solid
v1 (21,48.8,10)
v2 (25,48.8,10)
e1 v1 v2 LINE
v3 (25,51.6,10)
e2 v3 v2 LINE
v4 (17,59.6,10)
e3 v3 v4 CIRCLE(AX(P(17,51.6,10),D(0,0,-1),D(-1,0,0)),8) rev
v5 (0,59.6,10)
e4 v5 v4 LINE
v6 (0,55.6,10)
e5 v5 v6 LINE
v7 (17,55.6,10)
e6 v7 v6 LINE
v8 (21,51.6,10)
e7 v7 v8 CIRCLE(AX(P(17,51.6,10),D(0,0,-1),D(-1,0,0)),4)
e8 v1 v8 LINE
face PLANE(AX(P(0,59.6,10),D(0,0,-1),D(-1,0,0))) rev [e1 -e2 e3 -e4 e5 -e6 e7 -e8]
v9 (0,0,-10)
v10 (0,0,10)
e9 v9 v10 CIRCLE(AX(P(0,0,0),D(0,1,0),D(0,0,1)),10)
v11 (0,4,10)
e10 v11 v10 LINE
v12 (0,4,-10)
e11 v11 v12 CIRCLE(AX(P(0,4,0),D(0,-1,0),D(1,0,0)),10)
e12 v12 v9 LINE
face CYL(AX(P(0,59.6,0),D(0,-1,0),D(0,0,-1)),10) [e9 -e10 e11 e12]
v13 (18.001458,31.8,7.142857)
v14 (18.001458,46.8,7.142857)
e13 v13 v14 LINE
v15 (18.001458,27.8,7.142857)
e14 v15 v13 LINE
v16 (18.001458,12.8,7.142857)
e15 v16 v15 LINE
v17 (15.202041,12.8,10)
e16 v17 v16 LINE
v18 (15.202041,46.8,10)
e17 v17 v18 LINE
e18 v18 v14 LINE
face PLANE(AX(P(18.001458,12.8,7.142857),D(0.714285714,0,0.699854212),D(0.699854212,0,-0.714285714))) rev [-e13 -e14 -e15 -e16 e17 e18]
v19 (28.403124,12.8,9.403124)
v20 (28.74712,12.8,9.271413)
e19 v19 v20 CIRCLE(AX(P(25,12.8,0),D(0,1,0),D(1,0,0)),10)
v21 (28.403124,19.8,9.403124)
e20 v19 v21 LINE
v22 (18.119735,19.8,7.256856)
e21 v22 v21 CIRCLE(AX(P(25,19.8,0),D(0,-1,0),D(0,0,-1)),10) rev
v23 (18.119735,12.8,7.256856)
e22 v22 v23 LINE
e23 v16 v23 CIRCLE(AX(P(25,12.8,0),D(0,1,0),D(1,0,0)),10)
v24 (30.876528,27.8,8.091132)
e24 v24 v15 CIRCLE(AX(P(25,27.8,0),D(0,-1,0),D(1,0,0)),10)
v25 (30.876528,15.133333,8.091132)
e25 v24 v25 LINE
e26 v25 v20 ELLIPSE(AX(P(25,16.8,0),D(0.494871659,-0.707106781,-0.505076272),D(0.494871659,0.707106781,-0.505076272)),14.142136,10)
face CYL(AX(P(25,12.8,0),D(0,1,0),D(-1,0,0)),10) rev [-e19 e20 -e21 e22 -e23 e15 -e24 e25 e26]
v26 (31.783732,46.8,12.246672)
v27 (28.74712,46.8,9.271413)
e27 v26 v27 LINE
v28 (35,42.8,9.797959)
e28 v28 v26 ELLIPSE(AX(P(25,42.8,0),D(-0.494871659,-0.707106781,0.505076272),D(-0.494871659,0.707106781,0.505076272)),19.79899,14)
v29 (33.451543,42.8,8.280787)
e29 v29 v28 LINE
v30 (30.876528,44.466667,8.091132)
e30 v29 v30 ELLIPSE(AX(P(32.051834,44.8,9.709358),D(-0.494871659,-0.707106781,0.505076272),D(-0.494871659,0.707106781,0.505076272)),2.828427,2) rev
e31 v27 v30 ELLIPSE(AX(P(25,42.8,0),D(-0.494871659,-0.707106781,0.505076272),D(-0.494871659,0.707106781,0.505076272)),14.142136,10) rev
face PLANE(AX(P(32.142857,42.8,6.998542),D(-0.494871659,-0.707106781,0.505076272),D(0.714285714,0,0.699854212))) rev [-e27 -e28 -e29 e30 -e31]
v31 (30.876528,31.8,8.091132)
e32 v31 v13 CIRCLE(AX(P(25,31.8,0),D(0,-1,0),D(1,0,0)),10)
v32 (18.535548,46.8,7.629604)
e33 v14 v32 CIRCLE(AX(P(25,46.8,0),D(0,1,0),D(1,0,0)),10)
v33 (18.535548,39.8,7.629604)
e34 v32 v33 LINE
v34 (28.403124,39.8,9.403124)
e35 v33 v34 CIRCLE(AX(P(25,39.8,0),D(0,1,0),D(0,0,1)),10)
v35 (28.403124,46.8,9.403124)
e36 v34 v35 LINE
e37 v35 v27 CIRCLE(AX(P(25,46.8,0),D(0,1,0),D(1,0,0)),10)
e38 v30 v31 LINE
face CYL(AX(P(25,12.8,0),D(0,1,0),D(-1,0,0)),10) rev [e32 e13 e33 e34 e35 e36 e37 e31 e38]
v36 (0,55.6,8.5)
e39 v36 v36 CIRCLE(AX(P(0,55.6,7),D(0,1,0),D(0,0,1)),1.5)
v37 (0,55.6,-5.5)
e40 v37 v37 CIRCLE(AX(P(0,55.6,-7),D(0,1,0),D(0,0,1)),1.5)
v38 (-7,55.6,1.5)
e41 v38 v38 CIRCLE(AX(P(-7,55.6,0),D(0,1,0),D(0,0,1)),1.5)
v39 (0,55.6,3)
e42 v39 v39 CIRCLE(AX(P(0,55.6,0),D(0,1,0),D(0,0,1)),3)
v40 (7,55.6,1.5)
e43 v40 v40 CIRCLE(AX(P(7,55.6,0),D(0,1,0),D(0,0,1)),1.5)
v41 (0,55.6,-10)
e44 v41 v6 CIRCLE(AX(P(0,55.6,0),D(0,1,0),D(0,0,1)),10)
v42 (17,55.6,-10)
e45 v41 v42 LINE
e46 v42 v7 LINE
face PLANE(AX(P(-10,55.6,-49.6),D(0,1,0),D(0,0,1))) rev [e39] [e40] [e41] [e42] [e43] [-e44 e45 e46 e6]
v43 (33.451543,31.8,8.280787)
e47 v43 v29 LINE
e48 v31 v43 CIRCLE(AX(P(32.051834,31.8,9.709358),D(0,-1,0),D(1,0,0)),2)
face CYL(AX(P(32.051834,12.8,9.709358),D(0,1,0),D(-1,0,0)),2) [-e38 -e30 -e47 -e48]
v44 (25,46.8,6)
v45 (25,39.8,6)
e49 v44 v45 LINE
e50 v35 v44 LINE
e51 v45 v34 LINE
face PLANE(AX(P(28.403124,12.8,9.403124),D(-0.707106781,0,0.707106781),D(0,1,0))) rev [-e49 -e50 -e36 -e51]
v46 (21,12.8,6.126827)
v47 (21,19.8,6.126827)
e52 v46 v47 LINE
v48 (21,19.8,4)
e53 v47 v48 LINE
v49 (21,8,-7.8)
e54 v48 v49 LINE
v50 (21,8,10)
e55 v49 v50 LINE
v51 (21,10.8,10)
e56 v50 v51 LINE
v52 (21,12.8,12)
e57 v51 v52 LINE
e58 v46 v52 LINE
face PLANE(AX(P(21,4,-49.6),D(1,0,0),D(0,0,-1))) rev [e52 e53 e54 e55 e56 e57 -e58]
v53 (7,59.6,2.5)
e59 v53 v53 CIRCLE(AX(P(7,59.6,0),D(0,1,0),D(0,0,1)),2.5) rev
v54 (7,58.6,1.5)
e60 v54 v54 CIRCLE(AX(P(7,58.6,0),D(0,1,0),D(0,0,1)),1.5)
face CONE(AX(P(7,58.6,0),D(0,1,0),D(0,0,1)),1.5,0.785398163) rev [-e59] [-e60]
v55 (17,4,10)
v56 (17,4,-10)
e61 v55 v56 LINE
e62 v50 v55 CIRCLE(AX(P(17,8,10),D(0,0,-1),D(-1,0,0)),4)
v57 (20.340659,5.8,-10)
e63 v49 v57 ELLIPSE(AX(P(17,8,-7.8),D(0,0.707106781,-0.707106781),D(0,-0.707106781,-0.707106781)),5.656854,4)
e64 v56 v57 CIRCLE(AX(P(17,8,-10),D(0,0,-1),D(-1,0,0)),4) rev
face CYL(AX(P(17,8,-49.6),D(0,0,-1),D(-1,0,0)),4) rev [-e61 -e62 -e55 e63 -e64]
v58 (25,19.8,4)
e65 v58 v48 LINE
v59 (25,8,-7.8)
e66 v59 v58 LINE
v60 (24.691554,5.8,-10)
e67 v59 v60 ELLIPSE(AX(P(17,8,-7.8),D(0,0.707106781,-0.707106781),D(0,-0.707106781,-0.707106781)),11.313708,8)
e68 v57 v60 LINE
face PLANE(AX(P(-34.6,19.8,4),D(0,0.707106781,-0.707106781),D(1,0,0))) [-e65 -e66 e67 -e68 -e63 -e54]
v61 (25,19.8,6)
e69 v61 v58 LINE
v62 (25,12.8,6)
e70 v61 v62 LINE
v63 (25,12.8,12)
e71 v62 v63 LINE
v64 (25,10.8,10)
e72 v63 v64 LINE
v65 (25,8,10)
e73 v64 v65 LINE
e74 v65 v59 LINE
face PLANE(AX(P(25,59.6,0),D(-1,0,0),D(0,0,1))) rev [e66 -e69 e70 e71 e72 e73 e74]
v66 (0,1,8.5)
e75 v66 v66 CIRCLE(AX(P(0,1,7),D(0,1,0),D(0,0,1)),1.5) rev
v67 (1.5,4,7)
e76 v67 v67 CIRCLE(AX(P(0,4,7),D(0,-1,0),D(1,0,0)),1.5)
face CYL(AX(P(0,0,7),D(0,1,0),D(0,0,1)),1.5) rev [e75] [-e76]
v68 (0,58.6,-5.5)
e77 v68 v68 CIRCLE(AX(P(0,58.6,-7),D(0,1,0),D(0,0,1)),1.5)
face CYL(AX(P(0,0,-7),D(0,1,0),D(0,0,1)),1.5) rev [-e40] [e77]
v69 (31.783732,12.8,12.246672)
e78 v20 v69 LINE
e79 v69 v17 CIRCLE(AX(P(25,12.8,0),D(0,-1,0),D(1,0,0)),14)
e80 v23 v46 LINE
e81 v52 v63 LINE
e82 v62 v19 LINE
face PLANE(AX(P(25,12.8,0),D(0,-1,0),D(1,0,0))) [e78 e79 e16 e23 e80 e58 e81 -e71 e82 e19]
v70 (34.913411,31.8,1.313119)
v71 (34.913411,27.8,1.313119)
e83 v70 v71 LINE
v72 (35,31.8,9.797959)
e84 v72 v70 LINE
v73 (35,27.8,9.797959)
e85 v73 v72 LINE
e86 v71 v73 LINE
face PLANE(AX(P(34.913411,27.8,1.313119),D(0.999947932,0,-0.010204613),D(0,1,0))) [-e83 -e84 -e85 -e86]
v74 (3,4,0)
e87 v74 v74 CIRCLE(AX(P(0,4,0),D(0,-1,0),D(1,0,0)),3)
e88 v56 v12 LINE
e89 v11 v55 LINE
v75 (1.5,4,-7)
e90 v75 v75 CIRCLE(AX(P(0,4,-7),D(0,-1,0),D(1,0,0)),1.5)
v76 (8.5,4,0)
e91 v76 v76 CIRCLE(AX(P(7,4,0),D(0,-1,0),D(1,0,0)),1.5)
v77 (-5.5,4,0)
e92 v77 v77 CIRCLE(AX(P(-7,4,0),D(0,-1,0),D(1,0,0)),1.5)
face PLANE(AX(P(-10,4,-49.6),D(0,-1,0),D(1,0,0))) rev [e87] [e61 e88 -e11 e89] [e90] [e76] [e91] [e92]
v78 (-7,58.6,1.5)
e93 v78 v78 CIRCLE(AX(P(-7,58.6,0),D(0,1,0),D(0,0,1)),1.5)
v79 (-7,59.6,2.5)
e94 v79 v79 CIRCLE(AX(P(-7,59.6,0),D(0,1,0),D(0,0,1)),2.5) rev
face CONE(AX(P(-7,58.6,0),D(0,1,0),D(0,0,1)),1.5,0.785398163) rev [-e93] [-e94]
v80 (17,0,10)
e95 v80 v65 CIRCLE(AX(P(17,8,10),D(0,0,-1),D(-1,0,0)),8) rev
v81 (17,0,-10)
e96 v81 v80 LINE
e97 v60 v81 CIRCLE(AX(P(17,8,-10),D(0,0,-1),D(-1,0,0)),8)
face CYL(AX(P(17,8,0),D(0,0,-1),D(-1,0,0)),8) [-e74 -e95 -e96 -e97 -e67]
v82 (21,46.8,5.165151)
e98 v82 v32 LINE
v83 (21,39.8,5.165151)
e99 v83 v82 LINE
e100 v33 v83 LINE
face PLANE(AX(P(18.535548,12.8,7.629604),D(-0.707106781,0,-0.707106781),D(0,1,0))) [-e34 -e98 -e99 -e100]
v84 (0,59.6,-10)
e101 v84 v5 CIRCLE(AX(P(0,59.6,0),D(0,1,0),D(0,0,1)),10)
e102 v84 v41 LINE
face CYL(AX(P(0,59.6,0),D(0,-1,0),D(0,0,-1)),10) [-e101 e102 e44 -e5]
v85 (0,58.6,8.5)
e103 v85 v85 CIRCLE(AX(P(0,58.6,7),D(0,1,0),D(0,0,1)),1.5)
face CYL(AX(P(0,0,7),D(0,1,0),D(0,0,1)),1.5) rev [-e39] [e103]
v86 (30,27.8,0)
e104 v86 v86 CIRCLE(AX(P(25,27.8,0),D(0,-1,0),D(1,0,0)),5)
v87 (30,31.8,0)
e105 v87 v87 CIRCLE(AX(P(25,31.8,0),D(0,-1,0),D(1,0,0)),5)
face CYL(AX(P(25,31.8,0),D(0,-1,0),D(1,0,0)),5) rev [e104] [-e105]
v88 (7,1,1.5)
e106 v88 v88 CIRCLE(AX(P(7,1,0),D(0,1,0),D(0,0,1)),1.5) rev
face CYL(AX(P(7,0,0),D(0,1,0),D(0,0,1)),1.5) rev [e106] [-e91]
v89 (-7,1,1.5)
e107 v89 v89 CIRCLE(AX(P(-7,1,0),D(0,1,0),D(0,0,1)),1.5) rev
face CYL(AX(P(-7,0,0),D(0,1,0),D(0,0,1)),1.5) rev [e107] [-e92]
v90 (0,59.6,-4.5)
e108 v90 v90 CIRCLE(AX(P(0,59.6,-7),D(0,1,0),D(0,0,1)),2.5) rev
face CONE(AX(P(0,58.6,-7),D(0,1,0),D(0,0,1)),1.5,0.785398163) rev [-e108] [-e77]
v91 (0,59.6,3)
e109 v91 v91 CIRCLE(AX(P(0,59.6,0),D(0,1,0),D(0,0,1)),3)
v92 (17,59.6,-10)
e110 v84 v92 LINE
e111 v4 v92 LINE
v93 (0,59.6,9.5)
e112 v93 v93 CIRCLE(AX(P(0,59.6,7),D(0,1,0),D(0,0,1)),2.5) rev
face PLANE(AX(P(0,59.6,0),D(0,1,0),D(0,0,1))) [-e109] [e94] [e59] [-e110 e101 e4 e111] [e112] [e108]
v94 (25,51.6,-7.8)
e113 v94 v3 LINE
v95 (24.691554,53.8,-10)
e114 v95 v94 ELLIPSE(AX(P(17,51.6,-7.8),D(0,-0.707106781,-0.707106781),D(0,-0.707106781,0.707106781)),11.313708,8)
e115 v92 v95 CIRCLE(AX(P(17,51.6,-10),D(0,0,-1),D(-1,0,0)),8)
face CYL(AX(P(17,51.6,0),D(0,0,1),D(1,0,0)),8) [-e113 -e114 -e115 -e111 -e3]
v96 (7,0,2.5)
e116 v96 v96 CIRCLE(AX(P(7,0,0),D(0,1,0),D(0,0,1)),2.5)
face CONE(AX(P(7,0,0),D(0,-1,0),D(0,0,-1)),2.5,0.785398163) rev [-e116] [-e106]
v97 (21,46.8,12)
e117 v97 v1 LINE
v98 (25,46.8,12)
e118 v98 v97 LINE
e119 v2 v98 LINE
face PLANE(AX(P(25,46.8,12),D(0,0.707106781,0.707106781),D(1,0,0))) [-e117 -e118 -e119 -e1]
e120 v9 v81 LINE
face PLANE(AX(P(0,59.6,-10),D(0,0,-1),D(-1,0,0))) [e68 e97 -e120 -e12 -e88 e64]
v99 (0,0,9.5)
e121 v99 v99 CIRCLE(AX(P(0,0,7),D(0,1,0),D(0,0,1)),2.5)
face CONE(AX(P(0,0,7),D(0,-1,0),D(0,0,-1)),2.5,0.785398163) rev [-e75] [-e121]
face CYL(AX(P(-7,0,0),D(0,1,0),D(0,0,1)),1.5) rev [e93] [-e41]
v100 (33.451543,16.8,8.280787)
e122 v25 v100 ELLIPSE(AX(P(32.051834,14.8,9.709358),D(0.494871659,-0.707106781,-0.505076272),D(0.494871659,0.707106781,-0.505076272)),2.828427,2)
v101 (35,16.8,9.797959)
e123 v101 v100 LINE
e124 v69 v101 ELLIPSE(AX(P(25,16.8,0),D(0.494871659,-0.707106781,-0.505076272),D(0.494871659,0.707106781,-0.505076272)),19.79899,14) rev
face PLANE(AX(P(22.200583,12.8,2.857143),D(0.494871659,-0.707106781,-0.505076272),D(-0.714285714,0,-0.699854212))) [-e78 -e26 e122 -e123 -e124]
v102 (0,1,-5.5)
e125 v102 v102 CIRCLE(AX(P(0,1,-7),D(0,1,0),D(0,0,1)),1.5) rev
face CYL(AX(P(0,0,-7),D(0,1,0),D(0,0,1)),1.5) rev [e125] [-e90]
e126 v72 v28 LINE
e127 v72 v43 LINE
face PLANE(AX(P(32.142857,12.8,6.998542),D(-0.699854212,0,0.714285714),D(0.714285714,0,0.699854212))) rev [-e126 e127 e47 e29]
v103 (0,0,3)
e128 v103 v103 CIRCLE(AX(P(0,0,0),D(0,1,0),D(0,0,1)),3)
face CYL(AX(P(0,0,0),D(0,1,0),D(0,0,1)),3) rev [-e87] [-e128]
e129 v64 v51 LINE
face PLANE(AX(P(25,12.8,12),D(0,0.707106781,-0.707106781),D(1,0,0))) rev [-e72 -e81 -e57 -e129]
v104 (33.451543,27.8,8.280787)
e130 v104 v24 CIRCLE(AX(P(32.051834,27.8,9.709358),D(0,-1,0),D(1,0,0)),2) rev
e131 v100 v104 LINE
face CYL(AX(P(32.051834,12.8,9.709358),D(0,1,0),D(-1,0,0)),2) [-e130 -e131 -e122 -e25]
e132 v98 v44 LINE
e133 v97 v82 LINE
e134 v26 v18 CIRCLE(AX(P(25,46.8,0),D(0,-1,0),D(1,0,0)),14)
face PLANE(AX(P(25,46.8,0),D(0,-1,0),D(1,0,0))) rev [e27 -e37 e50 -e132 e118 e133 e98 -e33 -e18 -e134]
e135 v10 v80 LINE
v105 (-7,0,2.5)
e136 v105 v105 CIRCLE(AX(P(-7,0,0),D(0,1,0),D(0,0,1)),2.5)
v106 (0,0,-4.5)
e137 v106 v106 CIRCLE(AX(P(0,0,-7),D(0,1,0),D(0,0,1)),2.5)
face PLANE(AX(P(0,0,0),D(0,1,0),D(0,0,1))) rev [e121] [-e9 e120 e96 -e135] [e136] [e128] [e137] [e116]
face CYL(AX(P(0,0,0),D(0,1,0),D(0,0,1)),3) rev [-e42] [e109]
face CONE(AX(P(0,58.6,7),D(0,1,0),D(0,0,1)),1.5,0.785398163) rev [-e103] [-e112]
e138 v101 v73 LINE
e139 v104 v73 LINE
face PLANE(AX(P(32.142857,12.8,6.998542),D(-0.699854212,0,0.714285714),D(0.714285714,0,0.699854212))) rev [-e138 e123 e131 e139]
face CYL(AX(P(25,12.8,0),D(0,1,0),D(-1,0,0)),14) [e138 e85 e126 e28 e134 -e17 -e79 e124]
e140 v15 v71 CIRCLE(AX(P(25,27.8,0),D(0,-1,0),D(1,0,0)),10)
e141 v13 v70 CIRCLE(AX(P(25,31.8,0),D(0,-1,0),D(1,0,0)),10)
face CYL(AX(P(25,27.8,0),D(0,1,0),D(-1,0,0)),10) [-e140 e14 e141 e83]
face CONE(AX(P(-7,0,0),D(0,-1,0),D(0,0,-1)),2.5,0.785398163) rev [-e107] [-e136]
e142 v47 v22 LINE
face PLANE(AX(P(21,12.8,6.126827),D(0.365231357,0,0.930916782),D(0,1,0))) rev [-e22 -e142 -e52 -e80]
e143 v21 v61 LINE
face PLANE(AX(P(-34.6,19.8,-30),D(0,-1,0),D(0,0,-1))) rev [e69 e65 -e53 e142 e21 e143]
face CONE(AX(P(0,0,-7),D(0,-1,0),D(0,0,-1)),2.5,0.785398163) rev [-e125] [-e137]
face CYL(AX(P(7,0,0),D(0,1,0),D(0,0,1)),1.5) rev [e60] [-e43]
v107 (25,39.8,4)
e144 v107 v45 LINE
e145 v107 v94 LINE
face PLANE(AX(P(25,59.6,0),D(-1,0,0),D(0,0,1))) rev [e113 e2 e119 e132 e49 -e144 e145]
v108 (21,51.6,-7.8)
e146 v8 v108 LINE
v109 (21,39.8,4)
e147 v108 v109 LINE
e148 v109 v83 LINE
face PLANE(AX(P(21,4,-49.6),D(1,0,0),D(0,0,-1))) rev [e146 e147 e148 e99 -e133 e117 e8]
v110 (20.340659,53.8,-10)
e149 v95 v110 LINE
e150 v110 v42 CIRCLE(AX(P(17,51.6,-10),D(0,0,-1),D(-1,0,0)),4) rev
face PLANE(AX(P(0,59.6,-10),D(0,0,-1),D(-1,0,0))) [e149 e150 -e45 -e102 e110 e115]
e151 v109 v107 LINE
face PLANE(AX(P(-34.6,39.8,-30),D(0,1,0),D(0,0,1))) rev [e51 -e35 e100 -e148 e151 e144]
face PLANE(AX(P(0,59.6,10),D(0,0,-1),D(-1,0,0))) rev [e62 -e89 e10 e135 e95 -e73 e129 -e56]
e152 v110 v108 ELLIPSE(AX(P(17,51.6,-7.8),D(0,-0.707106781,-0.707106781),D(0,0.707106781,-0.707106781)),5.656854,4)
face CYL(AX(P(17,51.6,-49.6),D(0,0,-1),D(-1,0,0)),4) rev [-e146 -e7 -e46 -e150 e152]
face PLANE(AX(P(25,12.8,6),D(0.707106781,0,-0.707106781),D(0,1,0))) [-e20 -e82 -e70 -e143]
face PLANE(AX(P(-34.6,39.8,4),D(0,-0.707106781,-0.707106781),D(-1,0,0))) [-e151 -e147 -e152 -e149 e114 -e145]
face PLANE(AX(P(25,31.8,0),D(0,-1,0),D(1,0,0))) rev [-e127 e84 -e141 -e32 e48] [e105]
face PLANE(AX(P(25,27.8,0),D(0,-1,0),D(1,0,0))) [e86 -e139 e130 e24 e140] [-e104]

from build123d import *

# Parameters (mm, degrees)
BOSS_EXTRUDE1_DEPTH = 59.6
CUT_EXTRUDE1_DEPTH  = 59.6
SKETCH3_R           = 1.5000000000000004
SKETCH3_R_2         = 1.5000000000000007
SKETCH3_R_3         = 1.5000000000000009
SKETCH3_R_4         = 1.5000000000000002
CUT_EXTRUDE2_DEPTH  = 66.4
CHAMFER1_SIZE       = 1
SKETCH4_R           = 3
CUT_EXTRUDE3_DEPTH  = 66.4
FILLET1_R           = 4
CUT_EXTRUDE4_DEPTH  = 59.6
SKETCH5_R           = 10
BOSS_EXTRUDE2_DEPTH = 2
BOSS_EXTRUDE3_DEPTH = 17
CHAMFER2_SIZE       = 4
CHAMFER2_SIZE_2     = 3.038324347
CHAMFER3_SIZE       = 4
FILLET3_R           = 2
CHAMFER4_SIZE       = 14
CHAMFER5_SIZE       = 2
FILLET4_R           = 8
SKETCH11_R          = 5.000000000000001
CUT_EXTRUDE5_DEPTH  = 4


with BuildPart() as part:
    # Sketch1 → Boss-Extrude1 (new body)
    with BuildSketch(Plane(origin=(0, 0, 0), x_dir=(1, 0, 0), z_dir=(0, 1, 0))):
        with BuildLine():
            ThreePointArc((6.1e-16, 9.999999999999998), (-9.999999999999998, 1.22e-15), (-1.84e-15, -9.999999999999998))
            Line((0, -9.999999999999998), (0, 10.000000000000002))
        make_face()
        with BuildLine():
            Line((0, 10.000000000000002), (0, -9.999999999999998))
            ThreePointArc((-1.84e-15, -9.999999999999998), (7.071067811865472, -7.0710678118654755), (9.999999999999998, -2.45e-15))
            ThreePointArc((9.999999999999998, 0), (7.071067811865475, 7.071067811865474), (6.1e-16, 9.999999999999998))
        make_face()
        with BuildLine():
            ThreePointArc((9.999999999999998, -2.45e-15), (7.071067811865472, -7.0710678118654755), (-1.84e-15, -9.999999999999998))
            Line((0, -9.999999999999998), (25, -9.999999999999998))
            Line((25, -9.999999999999998), (25, 10.000000000000002))
            Line((25, 10), (0, 10.000000000000002))
            ThreePointArc((6.1e-16, 9.999999999999998), (7.071067811865475, 7.071067811865474), (9.999999999999998, 0))
        make_face()
    extrude(amount=BOSS_EXTRUDE1_DEPTH)

    # Sketch2 → Cut-Extrude1 (cut)
    with BuildSketch(Plane.XY.offset(9.999999999999998)):
        Polygon((-9.999999999999998, 4.0000000000000036), (21, 4), (21, 55.599999999999994), (-9.999999999999998, 55.599999999999994), align=None)
    extrude(amount=-CUT_EXTRUDE1_DEPTH, mode=Mode.SUBTRACT)

    # Sketch3 → Cut-Extrude2 (cut, through all)
    with BuildSketch(Plane(origin=(0, 59.6, 0), x_dir=(1, 0, 0), z_dir=(0, 1, 0))):
        with Locations(Location((-7, 0, 0), (0, 0, 270))):
            Circle(SKETCH3_R)
        with Locations(Location((2.444e-14, 7, 0), (0, 0, 270))):
            Circle(SKETCH3_R_2)
        with Locations(Location((7, -4.888e-14, 0), (0, 0, 270))):
            Circle(SKETCH3_R_3)
        with Locations(Location((-7.332e-14, -7.000000000000001, 0), (0, 0, 270))):
            Circle(SKETCH3_R_4)
    extrude(amount=-CUT_EXTRUDE2_DEPTH, mode=Mode.SUBTRACT)

    # Chamfer1
    chamfer1_edges = [part.edges().sort_by_distance(p)[0] for p in [
        (-7, 0, -1.5000000000000004),
        (-7, 59.6, -1.5000000000000004),
        (2.49e-14, 0, -8.5),
        (2.49e-14, 59.6, -8.5),
        (7.000000000000001, 0, -1.499999999999952),
        (7.000000000000001, 59.6, -1.499999999999952),
        (-7.286e-14, 0, 5.500000000000001),
        (-7.286e-14, 59.6, 5.500000000000001),
    ]]
    chamfer(chamfer1_edges, length=CHAMFER1_SIZE)

    # Sketch4 → Cut-Extrude3 (cut, through all)
    with BuildSketch(Plane(origin=(0, 59.6, 0), x_dir=(1, 0, 0), z_dir=(0, 1, 0))):
        with Locations(Location((0, 0, 0), (0, 0, 270))):
            Circle(SKETCH4_R)
    extrude(amount=-CUT_EXTRUDE3_DEPTH, mode=Mode.SUBTRACT)

    # Fillet1
    fillet1_edges = [part.edges().sort_by_distance(p)[0] for p in [
        (21, 4, -1.78e-15),
        (21, 55.599999999999994, -1.78e-15),
    ]]
    fillet(fillet1_edges, radius=FILLET1_R)

    # Sketch6 → Cut-Extrude4 (cut)
    with BuildSketch(Plane(origin=(25, 0, 0), x_dir=(0, 0, -1), z_dir=(1, 0, 0))):
        Polygon((30, 19.799999999999997), (-10, 19.799999999999983), (-9.999999999999998, 39.800000000000004), (30, 39.800000000000004), align=None)
    extrude(amount=-CUT_EXTRUDE4_DEPTH, mode=Mode.SUBTRACT)


with BuildPart() as cut_extrude4_piece_1:
    # of the separate pieces the step leaves, piece 1, a body of its own (cut_extrude4_pieces)
    add(part.part.solids().sort_by_distance((21, 39.8, -10))[0])



with BuildPart() as cut_extrude4_piece_2:
    # of the separate pieces the step leaves, piece 2, a body of its own (cut_extrude4_pieces)
    add(part.part.solids().sort_by_distance((17, 4, -10))[0])


with BuildPart() as body_3:
    # Sketch5 → Boss-Extrude2 (new, symmetric)
    with BuildSketch(Plane(origin=(1.67e-15, 29.8, 0), x_dir=(-1, 6e-17, 0), z_dir=(-6e-17, -1, 0))):
        with Locations(Location((-25, 0, 0), (0, 0, 180))):
            Circle(SKETCH5_R)
    extrude(amount=BOSS_EXTRUDE2_DEPTH, both=True)


with BuildPart() as cut_extrude4_piece_1_1:
    add(cut_extrude4_piece_1.part)

    add(cut_extrude4_piece_2.part)  # Boss-Extrude3 merges Cut-Extrude4 piece 2

    add(body_3.part)  # Boss-Extrude3 merges body 3
    # Sketch8 → Boss-Extrude3 (add, symmetric)
    with BuildSketch(Plane(origin=(1.67e-15, 29.8, 0), x_dir=(-1, 6e-17, 0), z_dir=(-6e-17, -1, 0))):
        with BuildLine():
            Line((-18.00145787776235, -7.1428571428571415), (-15.202041028867285, -9.999999999999998))
            ThreePointArc((-15.202041028867285, -9.999999999999998), (-25.14286458158996, -13.999271042140986), (-35, -9.797958971132715))
            Line((-35, -9.797958971132715), (-32.142857142857146, -6.998542122237653))
            ThreePointArc((-32.142857142857146, -6.998542122237653), (-25.10204612970712, -9.999479315814993), (-18.00145787776235, -7.1428571428571415))
        make_face()
    extrude(amount=BOSS_EXTRUDE3_DEPTH, both=True)

    # Chamfer2
    # the kernel refuses this chamfer: 4, 3.038324347 mm, written as the material it adds along each edge
    with BuildSketch(Plane(origin=(25, 39.800000000000004, 9.999999999999998), x_dir=(0, 0, -1), z_dir=(0, 1, 0))) as chamfer2_piece_1:
        with BuildLine():
            Line((CHAMFER2_SIZE, 0), (0.5968757625671461, -3.403124237432852))
            ThreePointArc((0.5968757625671461, -3.403124237432852), (0.15846004750250664, -1.7731585838259747), (0, 0))
            Line((0, 0), (CHAMFER2_SIZE, 0))
        make_face()
    extrude(amount=6.999999999999993)
    with BuildSketch(Plane(origin=(25, 12.799999999999999, 9.999999999999998), x_dir=(0.9849650815494138, 0, -0.17275354736837392), z_dir=(0, 1, 0))) as chamfer2_piece_2:
        with BuildLine():
            Line((3.4550709473675134, 2e-17), (CHAMFER2_SIZE * 0.172753547368, CHAMFER2_SIZE * 0.984965081549))
            Line((CHAMFER2_SIZE * 0.172753547368, CHAMFER2_SIZE * 0.984965081549), (0, 0))
            ThreePointArc((0, 0), (1.773873824440413, -0.15024182179198892), (3.4550709473675134, 2e-17))
        make_face()
    extrude(amount=6.999999999999984)
    with BuildSketch(Plane(origin=(21, 46.8, 9.165151389911681), x_dir=(0, 0, -1), z_dir=(-6e-17, -1, 0))) as chamfer2_piece_3:
        with BuildLine():
            Line((CHAMFER2_SIZE, 0), (1.5355475582413494, -2.464452441758805))
            ThreePointArc((1.5355475582413494, -2.464452441758805), (0.6874579868810571, -1.3036510598088036), (0, 0))
            Line((0, 0), (CHAMFER2_SIZE, 0))
        make_face()
    extrude(amount=6.999999999999993)
    with BuildSketch(Plane(origin=(21, 19.799999999999983, 9.165151389911681), x_dir=(-0.8336339896703572, 0, -0.5523172740973098), z_dir=(-6e-17, -1, 0))) as chamfer2_piece_4:
        with BuildLine():
            Line((3.4550709473675125, 1.3e-16), (CHAMFER2_SIZE_2 * 0.552317274099, CHAMFER2_SIZE_2 * 0.833633989672))
            Line((CHAMFER2_SIZE_2 * 0.552317274099, CHAMFER2_SIZE_2 * 0.833633989672), (0, 0))
            ThreePointArc((0, 0), (1.7738738244404142, -0.1502418217919865), (3.4550709473675125, 1.3e-16))
        make_face()
    extrude(amount=6.999999999999982)
    # the kernel refuses this chamfer: 4, 3.038324347 mm, written as the material it takes off along each edge
    with BuildSketch(Plane(origin=(42.3476656799026, 46.8, 16.997171657661287), x_dir=(4.2e-16, -1, -4.8e-16), z_dir=(-0.7142857142857139, 0, -0.6998542122237658))) as chamfer2_2_piece_1_section:
        Polygon((CHAMFER2_SIZE, 0), (-2.54e-15, CHAMFER2_SIZE), (0, 0), align=None)
    chamfer2_2_piece_1 = extrude(amount=24.573463903727287, mode=Mode.PRIVATE)
    chamfer2_2_piece_1 = split(chamfer2_2_piece_1, bisect_by=Plane(origin=(25, 46.8, 16.997171657661287), z_dir=(1, 0, 0)), keep=Keep.TOP, mode=Mode.PRIVATE)
    add(chamfer2_2_piece_1, mode=Mode.SUBTRACT)
    with BuildSketch(Plane(origin=(42.3476656799026, 12.799999999999999, 16.997171657661287), x_dir=(-0.6998542122237658, 0, 0.7142857142857139), z_dir=(-0.7142857142857139, 0, -0.6998542122237658))) as chamfer2_2_piece_2_section:
        Polygon((CHAMFER2_SIZE, 0), (-2.54e-15, CHAMFER2_SIZE), (0, 0), align=None)
    chamfer2_2_piece_2 = extrude(amount=24.57346390372729, mode=Mode.PRIVATE)
    chamfer2_2_piece_2 = split(chamfer2_2_piece_2, bisect_by=Plane(origin=(25, 12.799999999999999, 16.997171657661287), z_dir=(1, 0, 0)), keep=Keep.TOP, mode=Mode.PRIVATE)
    add(chamfer2_2_piece_2, mode=Mode.SUBTRACT)

    # Chamfer3
    # the kernel refuses this chamfer: 4 mm, written as the material it adds along each edge
    with BuildSketch(Plane(origin=(32.142857142857146, 31.8, 6.998542122237653), x_dir=(0.7142857142857139, 0, 0.6998542122237658), z_dir=(0, -1, 0))) as chamfer3_piece_1:
        with BuildLine():
            Line((CHAMFER3_SIZE, -9e-17), (-2.0000000000000133, -6.0000000000000115))
            ThreePointArc((-2.0000000000000133, -6.0000000000000115), (-0.5373798977418118, -3.234010018589798), (0, 0))
            Line((0, 0), (CHAMFER3_SIZE, -9e-17))
        make_face()
    extrude(amount=4)

    # Fillet3
    fillet3_edges = [cut_extrude4_piece_1_1.edges().sort_by_distance(p)[0] for p in [
        (32.142857142857146, 37.3, 6.998542122237653),
        (32.142857142857146, 22.3, 6.998542122237653),
    ]]
    fillet(fillet3_edges, radius=FILLET3_R)

    # Chamfer4
    chamfer4_edges = [cut_extrude4_piece_1_1.edges().sort_by_distance(p)[0] for p in [
        (23, 39.800000000000004, -10),
        (23, 19.79999999999999, -10),
    ]]
    chamfer(chamfer4_edges, length=CHAMFER4_SIZE)

    # Chamfer5
    chamfer5_edges = [cut_extrude4_piece_1_1.edges().sort_by_distance(p)[0] for p in [
        (23, 46.8, 9.999999999999998),
        (23, 12.8, 9.999999999999998),
    ]]
    chamfer(chamfer5_edges, length=CHAMFER5_SIZE)

    # Fillet4
    fillet4_edges = [cut_extrude4_piece_1_1.edges().sort_by_distance(p)[0] for p in [
        (25, 0, -1.78e-15),
        (25, 59.6, -1.78e-15),
    ]]
    fillet(fillet4_edges, radius=FILLET4_R)

    # Sketch11 → Cut-Extrude5 (cut)
    with BuildSketch(Plane.XZ.offset(-27.8)):
        with Locations((25, 0)):
            Circle(SKETCH11_R)
    extrude(amount=-CUT_EXTRUDE5_DEPTH, mode=Mode.SUBTRACT)


solid = cut_extrude4_piece_1_1.part
